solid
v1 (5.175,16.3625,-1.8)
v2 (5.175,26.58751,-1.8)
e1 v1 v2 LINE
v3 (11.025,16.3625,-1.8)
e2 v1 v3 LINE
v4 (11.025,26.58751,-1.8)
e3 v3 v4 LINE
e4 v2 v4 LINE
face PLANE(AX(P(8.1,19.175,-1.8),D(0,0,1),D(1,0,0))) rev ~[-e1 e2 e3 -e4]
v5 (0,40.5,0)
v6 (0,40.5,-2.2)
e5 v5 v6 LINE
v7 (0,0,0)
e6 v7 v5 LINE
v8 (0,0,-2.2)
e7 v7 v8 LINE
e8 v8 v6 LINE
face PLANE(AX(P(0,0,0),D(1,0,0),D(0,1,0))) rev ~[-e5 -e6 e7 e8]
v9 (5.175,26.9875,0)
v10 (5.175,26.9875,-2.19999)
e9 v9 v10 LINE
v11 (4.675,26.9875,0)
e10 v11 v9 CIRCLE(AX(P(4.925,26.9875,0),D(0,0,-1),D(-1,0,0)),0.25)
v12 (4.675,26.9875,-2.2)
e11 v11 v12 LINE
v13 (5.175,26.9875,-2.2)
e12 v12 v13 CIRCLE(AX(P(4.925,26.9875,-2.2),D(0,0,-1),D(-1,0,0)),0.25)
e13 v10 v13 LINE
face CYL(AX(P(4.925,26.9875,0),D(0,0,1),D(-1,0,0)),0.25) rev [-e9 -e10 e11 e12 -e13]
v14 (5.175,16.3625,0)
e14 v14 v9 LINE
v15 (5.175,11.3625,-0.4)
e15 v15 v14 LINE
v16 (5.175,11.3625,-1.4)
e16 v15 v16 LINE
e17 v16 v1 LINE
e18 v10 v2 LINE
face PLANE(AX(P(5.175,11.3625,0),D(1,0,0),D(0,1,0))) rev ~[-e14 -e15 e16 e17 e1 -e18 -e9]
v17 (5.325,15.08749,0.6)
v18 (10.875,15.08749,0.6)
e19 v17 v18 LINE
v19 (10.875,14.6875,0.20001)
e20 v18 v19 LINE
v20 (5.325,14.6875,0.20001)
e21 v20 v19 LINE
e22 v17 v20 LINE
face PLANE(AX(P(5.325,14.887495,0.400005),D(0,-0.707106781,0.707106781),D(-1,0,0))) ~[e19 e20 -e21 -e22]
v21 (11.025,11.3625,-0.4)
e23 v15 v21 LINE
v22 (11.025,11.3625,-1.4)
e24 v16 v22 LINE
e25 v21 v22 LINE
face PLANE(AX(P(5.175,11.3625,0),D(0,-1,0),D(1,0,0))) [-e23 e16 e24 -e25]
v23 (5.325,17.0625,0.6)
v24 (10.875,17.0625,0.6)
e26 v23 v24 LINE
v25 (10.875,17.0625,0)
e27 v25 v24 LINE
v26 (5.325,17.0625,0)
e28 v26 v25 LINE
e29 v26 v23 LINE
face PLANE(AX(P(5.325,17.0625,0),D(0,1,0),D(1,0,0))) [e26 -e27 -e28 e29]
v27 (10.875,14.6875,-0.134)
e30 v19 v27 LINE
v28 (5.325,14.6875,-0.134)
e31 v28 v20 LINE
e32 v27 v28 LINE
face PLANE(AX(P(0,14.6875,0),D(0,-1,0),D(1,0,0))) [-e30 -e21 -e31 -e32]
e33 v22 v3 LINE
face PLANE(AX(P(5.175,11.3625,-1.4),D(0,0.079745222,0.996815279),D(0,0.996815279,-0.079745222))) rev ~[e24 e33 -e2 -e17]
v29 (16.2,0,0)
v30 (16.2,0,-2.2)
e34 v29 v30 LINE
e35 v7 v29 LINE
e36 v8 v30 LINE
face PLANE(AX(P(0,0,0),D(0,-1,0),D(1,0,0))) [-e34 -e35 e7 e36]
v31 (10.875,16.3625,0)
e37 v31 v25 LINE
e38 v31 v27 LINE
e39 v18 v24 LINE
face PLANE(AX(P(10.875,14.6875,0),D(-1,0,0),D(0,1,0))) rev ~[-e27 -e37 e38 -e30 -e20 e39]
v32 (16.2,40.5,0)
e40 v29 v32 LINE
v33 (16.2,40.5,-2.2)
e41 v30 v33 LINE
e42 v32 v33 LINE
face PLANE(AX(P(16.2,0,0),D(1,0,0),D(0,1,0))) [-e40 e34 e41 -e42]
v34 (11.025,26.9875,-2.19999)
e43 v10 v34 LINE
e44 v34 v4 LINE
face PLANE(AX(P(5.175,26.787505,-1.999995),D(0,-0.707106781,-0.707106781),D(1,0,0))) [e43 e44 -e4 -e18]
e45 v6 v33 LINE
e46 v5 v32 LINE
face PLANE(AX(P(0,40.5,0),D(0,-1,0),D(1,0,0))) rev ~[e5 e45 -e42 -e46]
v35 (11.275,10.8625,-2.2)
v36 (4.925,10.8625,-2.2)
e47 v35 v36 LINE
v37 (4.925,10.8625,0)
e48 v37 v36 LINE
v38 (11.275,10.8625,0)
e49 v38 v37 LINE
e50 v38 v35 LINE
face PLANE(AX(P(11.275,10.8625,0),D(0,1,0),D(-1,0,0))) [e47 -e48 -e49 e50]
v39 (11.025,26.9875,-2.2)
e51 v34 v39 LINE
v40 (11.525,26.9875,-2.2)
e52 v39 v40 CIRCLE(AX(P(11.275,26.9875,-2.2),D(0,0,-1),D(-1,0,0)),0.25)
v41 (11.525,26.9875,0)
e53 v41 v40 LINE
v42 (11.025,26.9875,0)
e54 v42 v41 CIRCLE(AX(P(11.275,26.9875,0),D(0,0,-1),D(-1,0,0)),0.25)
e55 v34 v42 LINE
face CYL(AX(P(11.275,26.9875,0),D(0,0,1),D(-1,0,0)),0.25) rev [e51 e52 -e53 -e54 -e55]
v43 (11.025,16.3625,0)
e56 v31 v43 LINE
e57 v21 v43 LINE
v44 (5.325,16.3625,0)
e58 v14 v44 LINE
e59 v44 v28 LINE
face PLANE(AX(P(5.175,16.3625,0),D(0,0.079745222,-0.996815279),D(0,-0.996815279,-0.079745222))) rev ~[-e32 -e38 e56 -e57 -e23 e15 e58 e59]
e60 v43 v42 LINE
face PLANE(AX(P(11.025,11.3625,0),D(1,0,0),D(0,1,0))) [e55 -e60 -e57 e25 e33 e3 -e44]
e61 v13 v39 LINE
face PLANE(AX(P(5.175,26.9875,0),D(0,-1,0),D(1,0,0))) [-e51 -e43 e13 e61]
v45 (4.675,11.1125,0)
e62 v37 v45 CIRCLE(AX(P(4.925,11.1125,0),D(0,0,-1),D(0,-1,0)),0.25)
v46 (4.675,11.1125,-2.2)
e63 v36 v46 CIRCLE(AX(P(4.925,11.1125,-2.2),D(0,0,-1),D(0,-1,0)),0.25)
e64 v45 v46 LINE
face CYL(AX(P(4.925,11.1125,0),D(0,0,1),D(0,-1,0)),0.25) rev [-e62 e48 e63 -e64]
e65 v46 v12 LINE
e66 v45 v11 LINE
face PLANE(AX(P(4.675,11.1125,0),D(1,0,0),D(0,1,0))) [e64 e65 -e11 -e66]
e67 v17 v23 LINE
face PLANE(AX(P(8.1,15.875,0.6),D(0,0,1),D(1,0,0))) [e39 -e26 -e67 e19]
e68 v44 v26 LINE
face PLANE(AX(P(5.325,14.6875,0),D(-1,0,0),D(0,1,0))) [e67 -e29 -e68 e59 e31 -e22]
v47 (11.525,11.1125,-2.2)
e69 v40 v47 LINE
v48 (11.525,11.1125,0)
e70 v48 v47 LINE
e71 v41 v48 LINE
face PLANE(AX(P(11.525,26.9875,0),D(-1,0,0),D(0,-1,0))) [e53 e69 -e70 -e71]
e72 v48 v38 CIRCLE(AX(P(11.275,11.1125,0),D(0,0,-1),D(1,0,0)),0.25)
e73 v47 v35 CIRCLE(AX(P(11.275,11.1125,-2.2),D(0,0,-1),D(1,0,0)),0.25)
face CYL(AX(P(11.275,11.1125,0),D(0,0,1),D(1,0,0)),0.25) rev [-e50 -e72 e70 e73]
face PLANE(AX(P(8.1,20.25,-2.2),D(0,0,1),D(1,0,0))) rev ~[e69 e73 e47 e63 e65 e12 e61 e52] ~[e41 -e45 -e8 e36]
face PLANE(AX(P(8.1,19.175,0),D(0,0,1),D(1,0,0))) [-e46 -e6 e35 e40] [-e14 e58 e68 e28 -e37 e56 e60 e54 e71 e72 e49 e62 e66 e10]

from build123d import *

# Parameters (mm, degrees)
F0_W         = 16.2
F0_H         = 40.5
F1_DEPTH     = 2.2
F0_W_2       = 5.85
F0_H_2       = 15.625
F0_W_3       = 5.55
F0_H_3       = 2.375
F2_DEPTH     = 1.8
F3_DEPTH     = 0.6
F4_T1_DEPTH  = 5.85
F4_T6_DEPTH  = 18.8484687937
F4_T11_DEPTH = 5.85
F4_T16_DEPTH = 18.8484687937
F5_SIZE      = 0.39999


# Not quite as in the source:
# - a fillet or chamfer that OpenCascade refuses, or shapes differently, is made with other operations: its cross-section is extruded or revolved along the edge and cut away or added
# - a fillet or chamfer is up to 0.001 mm smaller than in the source, because OpenCascade refuses the exact size


with BuildPart() as f1:
    # F0 (on Top) → F1 (new body)
    with BuildSketch(Plane.XY):
        with Locations((8.1, 20.25)):
            Rectangle(F0_W, F0_H)
        with BuildLine():
            Line((11.275, 10.8625), (4.925, 10.8625))
            ThreePointArc((4.925, 10.8625), (4.7482233047, 10.9357233047), (4.675, 11.1125))
            Line((4.675, 11.1125), (4.675, 26.9875))
            ThreePointArc((4.675, 26.9875), (4.925, 27.2375), (5.175, 26.9875))
            Line((5.175, 26.9875), (11.025, 26.9875))
            ThreePointArc((11.025, 26.9875), (11.275, 27.2375), (11.525, 26.9875))
            Line((11.525, 26.9875), (11.525, 11.1125))
            ThreePointArc((11.525, 11.1125), (11.4517766953, 10.9357233047), (11.275, 10.8625))
        make_face(mode=Mode.SUBTRACT)
    extrude(amount=-F1_DEPTH)

    # F0 (on Top) → F2 (join)
    with BuildSketch(Plane.XY):
        with Locations((8.1, 19.175)):
            Rectangle(F0_W_2, F0_H_2)
        with Locations((8.1, 15.875)):
            Rectangle(F0_W_3, F0_H_3, mode=Mode.SUBTRACT)
        with Locations((8.1, 15.875)):
            Rectangle(F0_W_3, F0_H_3)
    extrude(amount=-F2_DEPTH)

    # F0 (on Top) → F3 (join)
    with BuildSketch(Plane.XY):
        with Locations((8.1, 15.875)):
            Rectangle(F0_W_3, F0_H_3)
    extrude(amount=F3_DEPTH)

    # F4: chamfer of 5 x 0.4 on 2 edges, made by hand

    # F4_s2 → F4_t1 (cut)
    with BuildSketch(Plane.YZ.offset(5.175)):
        Polygon((11.3625, -1.4), (16.3625, -1.8), (11.3625, -1.8), align=None)
    extrude(amount=F4_T1_DEPTH, mode=Mode.SUBTRACT)


with BuildPart() as f4_tool4:
    # F4_s5 → F4_t6 (new body)
    with BuildSketch(Plane.YZ.offset(5.175)):
        Polygon((16.3625, 0), (11.3625, -0.4), (11.3625, 0), align=None)
    extrude(amount=F4_T6_DEPTH)

    split(bisect_by=Plane.YZ.offset(5.325), keep=Keep.BOTTOM)


with BuildPart() as f1_1:
    add(f1.part)

    # F4_t3: cut F4_tool4
    add(f4_tool4.part, mode=Mode.SUBTRACT)


with BuildPart() as f4_tool9:
    # F4_s10 → F4_t11 (new body)
    with BuildSketch(Plane.YZ.offset(5.175)):
        Polygon((16.3625, 0), (11.3625, -0.4), (11.3625, 0), align=None)
    extrude(amount=F4_T11_DEPTH)

    split(bisect_by=Plane.XZ.offset(-14.6875), keep=Keep.TOP)


with BuildPart() as f1_2:
    add(f1_1.part)

    # F4_t8: cut F4_tool9
    add(f4_tool9.part, mode=Mode.SUBTRACT)


with BuildPart() as f4_tool14:
    # F4_s15 → F4_t16 (new body)
    with BuildSketch(Plane.YZ.offset(-7.8234687937)):
        Polygon((16.3625, 0), (11.3625, -0.4), (11.3625, 0), align=None)
    extrude(amount=F4_T16_DEPTH)

    split(bisect_by=Plane.YZ.offset(10.875), keep=Keep.TOP)


with BuildPart() as f1_3:
    add(f1_2.part)

    # F4_t13: cut F4_tool14
    add(f4_tool14.part, mode=Mode.SUBTRACT)

    # F5 (size 0.4 in the source; OpenCascade refuses exactly that, so slightly less here)
    f5_edges = [f1_3.edges().sort_by_distance(p)[0] for p in [
        (8.1, 14.6875, 0.6),
        (8.1, 26.9875, -1.8),
    ]]
    chamfer(f5_edges, length=F5_SIZE)


solid = f1_3.part
